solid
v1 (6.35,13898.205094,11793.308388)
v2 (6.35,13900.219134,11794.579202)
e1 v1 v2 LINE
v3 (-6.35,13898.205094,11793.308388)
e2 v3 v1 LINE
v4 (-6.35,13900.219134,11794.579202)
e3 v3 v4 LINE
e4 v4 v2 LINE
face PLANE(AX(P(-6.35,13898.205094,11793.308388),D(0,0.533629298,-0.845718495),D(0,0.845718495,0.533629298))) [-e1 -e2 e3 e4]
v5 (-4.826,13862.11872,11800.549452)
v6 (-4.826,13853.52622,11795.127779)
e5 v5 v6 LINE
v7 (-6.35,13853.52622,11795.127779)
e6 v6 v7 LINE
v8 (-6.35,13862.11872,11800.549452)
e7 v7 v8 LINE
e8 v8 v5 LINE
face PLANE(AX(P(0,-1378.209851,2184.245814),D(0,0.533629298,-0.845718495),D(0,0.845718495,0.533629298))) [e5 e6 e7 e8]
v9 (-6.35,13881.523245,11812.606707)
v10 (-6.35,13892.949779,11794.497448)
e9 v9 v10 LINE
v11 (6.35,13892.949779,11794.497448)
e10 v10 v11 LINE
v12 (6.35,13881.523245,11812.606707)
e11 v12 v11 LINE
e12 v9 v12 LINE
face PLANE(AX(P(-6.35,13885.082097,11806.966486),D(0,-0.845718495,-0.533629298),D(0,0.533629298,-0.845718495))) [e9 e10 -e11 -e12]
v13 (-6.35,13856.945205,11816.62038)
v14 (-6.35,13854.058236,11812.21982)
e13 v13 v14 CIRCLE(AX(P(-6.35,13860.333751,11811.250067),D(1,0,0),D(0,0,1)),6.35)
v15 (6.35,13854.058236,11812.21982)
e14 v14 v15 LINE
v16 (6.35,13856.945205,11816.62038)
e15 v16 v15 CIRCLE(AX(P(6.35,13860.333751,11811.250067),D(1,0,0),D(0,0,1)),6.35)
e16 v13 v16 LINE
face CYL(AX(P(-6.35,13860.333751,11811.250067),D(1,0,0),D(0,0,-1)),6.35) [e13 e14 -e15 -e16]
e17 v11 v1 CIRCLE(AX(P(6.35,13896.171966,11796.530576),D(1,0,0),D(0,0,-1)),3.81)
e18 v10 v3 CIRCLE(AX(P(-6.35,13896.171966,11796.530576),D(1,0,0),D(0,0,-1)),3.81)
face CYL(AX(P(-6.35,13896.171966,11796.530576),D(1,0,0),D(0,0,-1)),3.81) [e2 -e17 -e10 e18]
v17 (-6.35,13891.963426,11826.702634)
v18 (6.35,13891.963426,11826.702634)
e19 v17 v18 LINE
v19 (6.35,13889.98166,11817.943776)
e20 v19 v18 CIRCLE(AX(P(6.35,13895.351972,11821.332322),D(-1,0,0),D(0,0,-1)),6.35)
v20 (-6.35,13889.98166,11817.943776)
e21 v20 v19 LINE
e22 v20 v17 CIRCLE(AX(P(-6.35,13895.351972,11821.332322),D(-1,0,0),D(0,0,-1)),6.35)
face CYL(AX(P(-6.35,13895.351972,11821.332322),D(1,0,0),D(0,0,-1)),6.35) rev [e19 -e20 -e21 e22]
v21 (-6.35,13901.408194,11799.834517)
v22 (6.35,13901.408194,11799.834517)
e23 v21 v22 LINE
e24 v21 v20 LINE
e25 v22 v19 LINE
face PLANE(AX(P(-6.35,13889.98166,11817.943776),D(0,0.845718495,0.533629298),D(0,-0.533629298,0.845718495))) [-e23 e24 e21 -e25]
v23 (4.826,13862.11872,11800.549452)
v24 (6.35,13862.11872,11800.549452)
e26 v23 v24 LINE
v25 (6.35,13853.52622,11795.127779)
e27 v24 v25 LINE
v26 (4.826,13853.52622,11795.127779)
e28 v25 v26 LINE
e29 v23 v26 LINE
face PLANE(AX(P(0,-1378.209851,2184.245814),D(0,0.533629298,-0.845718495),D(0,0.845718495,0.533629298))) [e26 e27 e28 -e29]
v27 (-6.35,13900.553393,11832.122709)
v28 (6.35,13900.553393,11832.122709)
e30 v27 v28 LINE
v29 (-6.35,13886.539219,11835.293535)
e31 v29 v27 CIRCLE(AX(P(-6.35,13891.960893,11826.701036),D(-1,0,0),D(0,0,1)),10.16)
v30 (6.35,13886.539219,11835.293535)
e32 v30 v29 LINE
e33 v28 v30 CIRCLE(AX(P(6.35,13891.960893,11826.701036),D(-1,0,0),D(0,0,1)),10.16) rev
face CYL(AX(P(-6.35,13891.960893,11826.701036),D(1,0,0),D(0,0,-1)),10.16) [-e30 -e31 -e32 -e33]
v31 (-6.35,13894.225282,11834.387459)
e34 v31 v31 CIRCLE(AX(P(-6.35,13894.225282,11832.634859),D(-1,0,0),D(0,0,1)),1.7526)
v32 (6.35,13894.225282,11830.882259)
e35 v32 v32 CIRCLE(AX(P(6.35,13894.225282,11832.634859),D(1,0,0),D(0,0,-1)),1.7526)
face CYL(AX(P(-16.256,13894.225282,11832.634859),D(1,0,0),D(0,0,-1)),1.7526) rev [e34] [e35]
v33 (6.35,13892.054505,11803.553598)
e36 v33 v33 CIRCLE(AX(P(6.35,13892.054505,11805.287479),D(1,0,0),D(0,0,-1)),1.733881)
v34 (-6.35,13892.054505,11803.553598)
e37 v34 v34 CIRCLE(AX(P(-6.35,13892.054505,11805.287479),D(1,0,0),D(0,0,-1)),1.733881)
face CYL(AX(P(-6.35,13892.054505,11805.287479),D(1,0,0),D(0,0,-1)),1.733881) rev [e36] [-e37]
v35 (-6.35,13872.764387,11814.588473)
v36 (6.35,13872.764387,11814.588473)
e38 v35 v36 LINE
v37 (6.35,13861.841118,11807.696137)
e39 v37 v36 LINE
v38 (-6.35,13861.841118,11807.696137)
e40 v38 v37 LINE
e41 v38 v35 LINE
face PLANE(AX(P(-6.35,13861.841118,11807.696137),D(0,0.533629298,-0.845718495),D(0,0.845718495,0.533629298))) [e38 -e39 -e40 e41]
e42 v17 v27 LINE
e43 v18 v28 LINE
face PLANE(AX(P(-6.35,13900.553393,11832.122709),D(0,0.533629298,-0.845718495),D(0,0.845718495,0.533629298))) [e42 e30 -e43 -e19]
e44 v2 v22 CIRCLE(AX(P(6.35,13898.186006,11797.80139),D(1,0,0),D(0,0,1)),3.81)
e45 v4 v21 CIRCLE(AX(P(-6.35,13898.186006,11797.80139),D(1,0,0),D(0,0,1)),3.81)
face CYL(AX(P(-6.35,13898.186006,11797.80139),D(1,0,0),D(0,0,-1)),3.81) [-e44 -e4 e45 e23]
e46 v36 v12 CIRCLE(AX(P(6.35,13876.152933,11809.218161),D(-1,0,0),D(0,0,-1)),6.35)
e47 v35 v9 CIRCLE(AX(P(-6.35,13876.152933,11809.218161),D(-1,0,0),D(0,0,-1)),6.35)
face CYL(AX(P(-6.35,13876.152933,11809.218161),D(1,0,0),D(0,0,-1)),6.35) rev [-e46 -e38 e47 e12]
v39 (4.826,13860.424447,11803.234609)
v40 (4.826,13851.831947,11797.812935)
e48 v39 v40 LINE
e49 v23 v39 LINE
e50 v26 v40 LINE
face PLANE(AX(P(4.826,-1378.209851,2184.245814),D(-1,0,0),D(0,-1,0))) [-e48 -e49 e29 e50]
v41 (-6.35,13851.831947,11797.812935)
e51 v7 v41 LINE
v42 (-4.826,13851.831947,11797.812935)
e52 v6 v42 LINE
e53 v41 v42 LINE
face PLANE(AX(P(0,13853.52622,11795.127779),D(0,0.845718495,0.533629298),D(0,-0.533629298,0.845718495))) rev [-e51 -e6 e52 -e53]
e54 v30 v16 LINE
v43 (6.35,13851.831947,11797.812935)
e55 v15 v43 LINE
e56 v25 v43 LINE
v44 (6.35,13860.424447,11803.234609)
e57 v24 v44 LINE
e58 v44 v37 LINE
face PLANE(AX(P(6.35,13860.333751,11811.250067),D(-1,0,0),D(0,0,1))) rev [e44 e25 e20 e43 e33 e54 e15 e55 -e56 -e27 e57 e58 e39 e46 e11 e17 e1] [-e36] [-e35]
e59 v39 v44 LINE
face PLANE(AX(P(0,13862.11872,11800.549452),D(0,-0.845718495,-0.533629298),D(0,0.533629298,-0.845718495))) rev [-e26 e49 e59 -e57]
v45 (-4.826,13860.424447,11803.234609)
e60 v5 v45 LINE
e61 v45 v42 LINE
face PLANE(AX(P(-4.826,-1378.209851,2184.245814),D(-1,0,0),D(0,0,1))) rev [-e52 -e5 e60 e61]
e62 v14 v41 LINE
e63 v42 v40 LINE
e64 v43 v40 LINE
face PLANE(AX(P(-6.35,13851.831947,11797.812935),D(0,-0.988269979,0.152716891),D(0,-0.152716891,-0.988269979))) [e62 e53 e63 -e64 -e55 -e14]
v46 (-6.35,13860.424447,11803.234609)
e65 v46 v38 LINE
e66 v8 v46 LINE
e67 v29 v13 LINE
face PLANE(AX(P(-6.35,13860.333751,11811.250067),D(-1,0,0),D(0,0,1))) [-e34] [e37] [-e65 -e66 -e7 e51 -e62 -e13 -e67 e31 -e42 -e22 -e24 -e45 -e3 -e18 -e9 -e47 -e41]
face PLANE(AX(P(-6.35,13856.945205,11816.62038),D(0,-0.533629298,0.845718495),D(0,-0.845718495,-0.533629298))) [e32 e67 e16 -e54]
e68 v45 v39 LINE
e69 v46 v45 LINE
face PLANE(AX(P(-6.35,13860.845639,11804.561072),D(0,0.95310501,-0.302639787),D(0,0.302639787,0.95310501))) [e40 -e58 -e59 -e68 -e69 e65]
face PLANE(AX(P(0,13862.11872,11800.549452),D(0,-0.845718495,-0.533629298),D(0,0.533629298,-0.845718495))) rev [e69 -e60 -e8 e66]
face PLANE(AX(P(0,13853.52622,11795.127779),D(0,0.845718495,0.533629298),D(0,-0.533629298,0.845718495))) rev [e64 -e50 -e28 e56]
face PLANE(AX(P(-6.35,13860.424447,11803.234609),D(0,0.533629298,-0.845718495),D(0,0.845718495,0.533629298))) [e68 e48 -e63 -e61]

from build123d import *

# Parameters (mm, degrees)
BOSS_EXTRUDE1_DEPTH      = 6.35
BOSS_EXTRUDE1_DEPTH_BACK = 6.35
SKETCH2_R                = 1.733880633
FILLET1_R                = 10.16
BOSS_EXTRUDE3_DEPTH      = 3.175
SKETCH7_R                = 1.7526
CUT_EXTRUDE3_DEPTH       = 22.606


with BuildPart() as part:
    # Sketch2 → Boss-Extrude1 (new, two sides: drawn at the far end of the back side and taken through both)
    with BuildSketch(Plane(origin=(0, 13820.707967808, 11763.157588594), x_dir=(0, 0.8457184946773667, 0.533629298071844), z_dir=(1, 0, 0)).offset(-BOSS_EXTRUDE1_DEPTH_BACK)):
        with BuildLine():
            Line((77.82010292, 2.698073613), (77.82010292, -12.045648124))
            ThreePointArc((77.82010292, -12.045648124), (78.936026083, -14.73972496), (81.63010292, -15.855648124))
            Line((81.63010292, -15.855648124), (84.011557282, -15.855648124))
            ThreePointArc((84.011557282, -15.855648124), (86.705634118, -14.73972496), (87.821557282, -12.045648124))
            Line((87.821557282, -12.045648124), (87.821557282, 2.698073613))
            Line((87.821557282, 2.698073613), (87.821557282, 9.367220025))
            ThreePointArc((87.821557282, 9.367220025), (89.681429221, 13.857348086), (94.171557282, 15.717220025))
            Line((94.171557282, 15.717220025), (104.328561269, 15.717220025))
            Line((104.328561269, 15.717220025), (104.328561269, 25.877220025))
            Line((104.328561269, 25.877220025), (59.175813007, 25.877220025))
            ThreePointArc((59.175813007, 25.877220025), (56.544296522, 25.306287509), (54.385982659, 23.696155769))
            Line((54.385982659, 23.696155769), (44.81523307, 12.7))
            Line((44.81523307, 12.7), (53.583504994, 12.7))
            Line((53.583504994, 12.7), (54.97523307, 12.7))
            Line((54.97523307, 12.7), (56.039282698, 13.597053748))
            Line((56.039282698, 13.597053748), (58.554139967, 15.717220025))
            Line((58.554139967, 15.717220025), (71.47010292, 15.717220025))
            ThreePointArc((71.47010292, 15.717220025), (75.96023098, 13.857348086), (77.82010292, 9.367220025))
            Line((77.82010292, 9.367220025), (77.82010292, 2.698073613))
        make_face()
        with Locations(Location((82.820830101, -2.442575088, 0), (0, 0, 237.748998542))):
            Circle(SKETCH2_R, mode=Mode.SUBTRACT)
    extrude(amount=BOSS_EXTRUDE1_DEPTH + BOSS_EXTRUDE1_DEPTH_BACK)

    # Fillet1
    fillet1_edges = [part.edges().sort_by_distance(p)[0] for p in [
        (0, 13895.131718838, 11840.715209079),
    ]]
    fillet(fillet1_edges, radius=FILLET1_R - 0.0001)  # a hair under: the kernel refuses the full size

    # Sketch5 → Boss-Extrude3 (add)
    with BuildSketch(Plane(origin=(0, -1379.90412378, 2186.930969826), x_dir=(-1, 0, 0), z_dir=(0, 0.5336292980726433, -0.8457184946768624))):
        Polygon((4.826, 18020.569098092), (4.826, 18011.9803546), (4.826, 18010.409098092), (6.35, 18010.409098092), (6.35, 18012.025656104), (6.35, 18020.569098092), align=None)
        Polygon((-6.35, 18011.9803546), (-6.35, 18020.569098092), (-4.826, 18020.569098092), (-4.826, 18011.9803546), (-4.826, 18010.409098092), (-6.35, 18010.409098092), align=None)
    extrude(amount=BOSS_EXTRUDE3_DEPTH)

    # Sketch7 → Cut-Extrude3 (cut)
    with BuildSketch(Plane(origin=(6.35, 0, 0), x_dir=(0, 0, -1), z_dir=(1, 0, 0))):
        with Locations((-11832.634859183, 13894.225281819)):
            Circle(SKETCH7_R)
    extrude(amount=-CUT_EXTRUDE3_DEPTH, mode=Mode.SUBTRACT)


solid = part.part
